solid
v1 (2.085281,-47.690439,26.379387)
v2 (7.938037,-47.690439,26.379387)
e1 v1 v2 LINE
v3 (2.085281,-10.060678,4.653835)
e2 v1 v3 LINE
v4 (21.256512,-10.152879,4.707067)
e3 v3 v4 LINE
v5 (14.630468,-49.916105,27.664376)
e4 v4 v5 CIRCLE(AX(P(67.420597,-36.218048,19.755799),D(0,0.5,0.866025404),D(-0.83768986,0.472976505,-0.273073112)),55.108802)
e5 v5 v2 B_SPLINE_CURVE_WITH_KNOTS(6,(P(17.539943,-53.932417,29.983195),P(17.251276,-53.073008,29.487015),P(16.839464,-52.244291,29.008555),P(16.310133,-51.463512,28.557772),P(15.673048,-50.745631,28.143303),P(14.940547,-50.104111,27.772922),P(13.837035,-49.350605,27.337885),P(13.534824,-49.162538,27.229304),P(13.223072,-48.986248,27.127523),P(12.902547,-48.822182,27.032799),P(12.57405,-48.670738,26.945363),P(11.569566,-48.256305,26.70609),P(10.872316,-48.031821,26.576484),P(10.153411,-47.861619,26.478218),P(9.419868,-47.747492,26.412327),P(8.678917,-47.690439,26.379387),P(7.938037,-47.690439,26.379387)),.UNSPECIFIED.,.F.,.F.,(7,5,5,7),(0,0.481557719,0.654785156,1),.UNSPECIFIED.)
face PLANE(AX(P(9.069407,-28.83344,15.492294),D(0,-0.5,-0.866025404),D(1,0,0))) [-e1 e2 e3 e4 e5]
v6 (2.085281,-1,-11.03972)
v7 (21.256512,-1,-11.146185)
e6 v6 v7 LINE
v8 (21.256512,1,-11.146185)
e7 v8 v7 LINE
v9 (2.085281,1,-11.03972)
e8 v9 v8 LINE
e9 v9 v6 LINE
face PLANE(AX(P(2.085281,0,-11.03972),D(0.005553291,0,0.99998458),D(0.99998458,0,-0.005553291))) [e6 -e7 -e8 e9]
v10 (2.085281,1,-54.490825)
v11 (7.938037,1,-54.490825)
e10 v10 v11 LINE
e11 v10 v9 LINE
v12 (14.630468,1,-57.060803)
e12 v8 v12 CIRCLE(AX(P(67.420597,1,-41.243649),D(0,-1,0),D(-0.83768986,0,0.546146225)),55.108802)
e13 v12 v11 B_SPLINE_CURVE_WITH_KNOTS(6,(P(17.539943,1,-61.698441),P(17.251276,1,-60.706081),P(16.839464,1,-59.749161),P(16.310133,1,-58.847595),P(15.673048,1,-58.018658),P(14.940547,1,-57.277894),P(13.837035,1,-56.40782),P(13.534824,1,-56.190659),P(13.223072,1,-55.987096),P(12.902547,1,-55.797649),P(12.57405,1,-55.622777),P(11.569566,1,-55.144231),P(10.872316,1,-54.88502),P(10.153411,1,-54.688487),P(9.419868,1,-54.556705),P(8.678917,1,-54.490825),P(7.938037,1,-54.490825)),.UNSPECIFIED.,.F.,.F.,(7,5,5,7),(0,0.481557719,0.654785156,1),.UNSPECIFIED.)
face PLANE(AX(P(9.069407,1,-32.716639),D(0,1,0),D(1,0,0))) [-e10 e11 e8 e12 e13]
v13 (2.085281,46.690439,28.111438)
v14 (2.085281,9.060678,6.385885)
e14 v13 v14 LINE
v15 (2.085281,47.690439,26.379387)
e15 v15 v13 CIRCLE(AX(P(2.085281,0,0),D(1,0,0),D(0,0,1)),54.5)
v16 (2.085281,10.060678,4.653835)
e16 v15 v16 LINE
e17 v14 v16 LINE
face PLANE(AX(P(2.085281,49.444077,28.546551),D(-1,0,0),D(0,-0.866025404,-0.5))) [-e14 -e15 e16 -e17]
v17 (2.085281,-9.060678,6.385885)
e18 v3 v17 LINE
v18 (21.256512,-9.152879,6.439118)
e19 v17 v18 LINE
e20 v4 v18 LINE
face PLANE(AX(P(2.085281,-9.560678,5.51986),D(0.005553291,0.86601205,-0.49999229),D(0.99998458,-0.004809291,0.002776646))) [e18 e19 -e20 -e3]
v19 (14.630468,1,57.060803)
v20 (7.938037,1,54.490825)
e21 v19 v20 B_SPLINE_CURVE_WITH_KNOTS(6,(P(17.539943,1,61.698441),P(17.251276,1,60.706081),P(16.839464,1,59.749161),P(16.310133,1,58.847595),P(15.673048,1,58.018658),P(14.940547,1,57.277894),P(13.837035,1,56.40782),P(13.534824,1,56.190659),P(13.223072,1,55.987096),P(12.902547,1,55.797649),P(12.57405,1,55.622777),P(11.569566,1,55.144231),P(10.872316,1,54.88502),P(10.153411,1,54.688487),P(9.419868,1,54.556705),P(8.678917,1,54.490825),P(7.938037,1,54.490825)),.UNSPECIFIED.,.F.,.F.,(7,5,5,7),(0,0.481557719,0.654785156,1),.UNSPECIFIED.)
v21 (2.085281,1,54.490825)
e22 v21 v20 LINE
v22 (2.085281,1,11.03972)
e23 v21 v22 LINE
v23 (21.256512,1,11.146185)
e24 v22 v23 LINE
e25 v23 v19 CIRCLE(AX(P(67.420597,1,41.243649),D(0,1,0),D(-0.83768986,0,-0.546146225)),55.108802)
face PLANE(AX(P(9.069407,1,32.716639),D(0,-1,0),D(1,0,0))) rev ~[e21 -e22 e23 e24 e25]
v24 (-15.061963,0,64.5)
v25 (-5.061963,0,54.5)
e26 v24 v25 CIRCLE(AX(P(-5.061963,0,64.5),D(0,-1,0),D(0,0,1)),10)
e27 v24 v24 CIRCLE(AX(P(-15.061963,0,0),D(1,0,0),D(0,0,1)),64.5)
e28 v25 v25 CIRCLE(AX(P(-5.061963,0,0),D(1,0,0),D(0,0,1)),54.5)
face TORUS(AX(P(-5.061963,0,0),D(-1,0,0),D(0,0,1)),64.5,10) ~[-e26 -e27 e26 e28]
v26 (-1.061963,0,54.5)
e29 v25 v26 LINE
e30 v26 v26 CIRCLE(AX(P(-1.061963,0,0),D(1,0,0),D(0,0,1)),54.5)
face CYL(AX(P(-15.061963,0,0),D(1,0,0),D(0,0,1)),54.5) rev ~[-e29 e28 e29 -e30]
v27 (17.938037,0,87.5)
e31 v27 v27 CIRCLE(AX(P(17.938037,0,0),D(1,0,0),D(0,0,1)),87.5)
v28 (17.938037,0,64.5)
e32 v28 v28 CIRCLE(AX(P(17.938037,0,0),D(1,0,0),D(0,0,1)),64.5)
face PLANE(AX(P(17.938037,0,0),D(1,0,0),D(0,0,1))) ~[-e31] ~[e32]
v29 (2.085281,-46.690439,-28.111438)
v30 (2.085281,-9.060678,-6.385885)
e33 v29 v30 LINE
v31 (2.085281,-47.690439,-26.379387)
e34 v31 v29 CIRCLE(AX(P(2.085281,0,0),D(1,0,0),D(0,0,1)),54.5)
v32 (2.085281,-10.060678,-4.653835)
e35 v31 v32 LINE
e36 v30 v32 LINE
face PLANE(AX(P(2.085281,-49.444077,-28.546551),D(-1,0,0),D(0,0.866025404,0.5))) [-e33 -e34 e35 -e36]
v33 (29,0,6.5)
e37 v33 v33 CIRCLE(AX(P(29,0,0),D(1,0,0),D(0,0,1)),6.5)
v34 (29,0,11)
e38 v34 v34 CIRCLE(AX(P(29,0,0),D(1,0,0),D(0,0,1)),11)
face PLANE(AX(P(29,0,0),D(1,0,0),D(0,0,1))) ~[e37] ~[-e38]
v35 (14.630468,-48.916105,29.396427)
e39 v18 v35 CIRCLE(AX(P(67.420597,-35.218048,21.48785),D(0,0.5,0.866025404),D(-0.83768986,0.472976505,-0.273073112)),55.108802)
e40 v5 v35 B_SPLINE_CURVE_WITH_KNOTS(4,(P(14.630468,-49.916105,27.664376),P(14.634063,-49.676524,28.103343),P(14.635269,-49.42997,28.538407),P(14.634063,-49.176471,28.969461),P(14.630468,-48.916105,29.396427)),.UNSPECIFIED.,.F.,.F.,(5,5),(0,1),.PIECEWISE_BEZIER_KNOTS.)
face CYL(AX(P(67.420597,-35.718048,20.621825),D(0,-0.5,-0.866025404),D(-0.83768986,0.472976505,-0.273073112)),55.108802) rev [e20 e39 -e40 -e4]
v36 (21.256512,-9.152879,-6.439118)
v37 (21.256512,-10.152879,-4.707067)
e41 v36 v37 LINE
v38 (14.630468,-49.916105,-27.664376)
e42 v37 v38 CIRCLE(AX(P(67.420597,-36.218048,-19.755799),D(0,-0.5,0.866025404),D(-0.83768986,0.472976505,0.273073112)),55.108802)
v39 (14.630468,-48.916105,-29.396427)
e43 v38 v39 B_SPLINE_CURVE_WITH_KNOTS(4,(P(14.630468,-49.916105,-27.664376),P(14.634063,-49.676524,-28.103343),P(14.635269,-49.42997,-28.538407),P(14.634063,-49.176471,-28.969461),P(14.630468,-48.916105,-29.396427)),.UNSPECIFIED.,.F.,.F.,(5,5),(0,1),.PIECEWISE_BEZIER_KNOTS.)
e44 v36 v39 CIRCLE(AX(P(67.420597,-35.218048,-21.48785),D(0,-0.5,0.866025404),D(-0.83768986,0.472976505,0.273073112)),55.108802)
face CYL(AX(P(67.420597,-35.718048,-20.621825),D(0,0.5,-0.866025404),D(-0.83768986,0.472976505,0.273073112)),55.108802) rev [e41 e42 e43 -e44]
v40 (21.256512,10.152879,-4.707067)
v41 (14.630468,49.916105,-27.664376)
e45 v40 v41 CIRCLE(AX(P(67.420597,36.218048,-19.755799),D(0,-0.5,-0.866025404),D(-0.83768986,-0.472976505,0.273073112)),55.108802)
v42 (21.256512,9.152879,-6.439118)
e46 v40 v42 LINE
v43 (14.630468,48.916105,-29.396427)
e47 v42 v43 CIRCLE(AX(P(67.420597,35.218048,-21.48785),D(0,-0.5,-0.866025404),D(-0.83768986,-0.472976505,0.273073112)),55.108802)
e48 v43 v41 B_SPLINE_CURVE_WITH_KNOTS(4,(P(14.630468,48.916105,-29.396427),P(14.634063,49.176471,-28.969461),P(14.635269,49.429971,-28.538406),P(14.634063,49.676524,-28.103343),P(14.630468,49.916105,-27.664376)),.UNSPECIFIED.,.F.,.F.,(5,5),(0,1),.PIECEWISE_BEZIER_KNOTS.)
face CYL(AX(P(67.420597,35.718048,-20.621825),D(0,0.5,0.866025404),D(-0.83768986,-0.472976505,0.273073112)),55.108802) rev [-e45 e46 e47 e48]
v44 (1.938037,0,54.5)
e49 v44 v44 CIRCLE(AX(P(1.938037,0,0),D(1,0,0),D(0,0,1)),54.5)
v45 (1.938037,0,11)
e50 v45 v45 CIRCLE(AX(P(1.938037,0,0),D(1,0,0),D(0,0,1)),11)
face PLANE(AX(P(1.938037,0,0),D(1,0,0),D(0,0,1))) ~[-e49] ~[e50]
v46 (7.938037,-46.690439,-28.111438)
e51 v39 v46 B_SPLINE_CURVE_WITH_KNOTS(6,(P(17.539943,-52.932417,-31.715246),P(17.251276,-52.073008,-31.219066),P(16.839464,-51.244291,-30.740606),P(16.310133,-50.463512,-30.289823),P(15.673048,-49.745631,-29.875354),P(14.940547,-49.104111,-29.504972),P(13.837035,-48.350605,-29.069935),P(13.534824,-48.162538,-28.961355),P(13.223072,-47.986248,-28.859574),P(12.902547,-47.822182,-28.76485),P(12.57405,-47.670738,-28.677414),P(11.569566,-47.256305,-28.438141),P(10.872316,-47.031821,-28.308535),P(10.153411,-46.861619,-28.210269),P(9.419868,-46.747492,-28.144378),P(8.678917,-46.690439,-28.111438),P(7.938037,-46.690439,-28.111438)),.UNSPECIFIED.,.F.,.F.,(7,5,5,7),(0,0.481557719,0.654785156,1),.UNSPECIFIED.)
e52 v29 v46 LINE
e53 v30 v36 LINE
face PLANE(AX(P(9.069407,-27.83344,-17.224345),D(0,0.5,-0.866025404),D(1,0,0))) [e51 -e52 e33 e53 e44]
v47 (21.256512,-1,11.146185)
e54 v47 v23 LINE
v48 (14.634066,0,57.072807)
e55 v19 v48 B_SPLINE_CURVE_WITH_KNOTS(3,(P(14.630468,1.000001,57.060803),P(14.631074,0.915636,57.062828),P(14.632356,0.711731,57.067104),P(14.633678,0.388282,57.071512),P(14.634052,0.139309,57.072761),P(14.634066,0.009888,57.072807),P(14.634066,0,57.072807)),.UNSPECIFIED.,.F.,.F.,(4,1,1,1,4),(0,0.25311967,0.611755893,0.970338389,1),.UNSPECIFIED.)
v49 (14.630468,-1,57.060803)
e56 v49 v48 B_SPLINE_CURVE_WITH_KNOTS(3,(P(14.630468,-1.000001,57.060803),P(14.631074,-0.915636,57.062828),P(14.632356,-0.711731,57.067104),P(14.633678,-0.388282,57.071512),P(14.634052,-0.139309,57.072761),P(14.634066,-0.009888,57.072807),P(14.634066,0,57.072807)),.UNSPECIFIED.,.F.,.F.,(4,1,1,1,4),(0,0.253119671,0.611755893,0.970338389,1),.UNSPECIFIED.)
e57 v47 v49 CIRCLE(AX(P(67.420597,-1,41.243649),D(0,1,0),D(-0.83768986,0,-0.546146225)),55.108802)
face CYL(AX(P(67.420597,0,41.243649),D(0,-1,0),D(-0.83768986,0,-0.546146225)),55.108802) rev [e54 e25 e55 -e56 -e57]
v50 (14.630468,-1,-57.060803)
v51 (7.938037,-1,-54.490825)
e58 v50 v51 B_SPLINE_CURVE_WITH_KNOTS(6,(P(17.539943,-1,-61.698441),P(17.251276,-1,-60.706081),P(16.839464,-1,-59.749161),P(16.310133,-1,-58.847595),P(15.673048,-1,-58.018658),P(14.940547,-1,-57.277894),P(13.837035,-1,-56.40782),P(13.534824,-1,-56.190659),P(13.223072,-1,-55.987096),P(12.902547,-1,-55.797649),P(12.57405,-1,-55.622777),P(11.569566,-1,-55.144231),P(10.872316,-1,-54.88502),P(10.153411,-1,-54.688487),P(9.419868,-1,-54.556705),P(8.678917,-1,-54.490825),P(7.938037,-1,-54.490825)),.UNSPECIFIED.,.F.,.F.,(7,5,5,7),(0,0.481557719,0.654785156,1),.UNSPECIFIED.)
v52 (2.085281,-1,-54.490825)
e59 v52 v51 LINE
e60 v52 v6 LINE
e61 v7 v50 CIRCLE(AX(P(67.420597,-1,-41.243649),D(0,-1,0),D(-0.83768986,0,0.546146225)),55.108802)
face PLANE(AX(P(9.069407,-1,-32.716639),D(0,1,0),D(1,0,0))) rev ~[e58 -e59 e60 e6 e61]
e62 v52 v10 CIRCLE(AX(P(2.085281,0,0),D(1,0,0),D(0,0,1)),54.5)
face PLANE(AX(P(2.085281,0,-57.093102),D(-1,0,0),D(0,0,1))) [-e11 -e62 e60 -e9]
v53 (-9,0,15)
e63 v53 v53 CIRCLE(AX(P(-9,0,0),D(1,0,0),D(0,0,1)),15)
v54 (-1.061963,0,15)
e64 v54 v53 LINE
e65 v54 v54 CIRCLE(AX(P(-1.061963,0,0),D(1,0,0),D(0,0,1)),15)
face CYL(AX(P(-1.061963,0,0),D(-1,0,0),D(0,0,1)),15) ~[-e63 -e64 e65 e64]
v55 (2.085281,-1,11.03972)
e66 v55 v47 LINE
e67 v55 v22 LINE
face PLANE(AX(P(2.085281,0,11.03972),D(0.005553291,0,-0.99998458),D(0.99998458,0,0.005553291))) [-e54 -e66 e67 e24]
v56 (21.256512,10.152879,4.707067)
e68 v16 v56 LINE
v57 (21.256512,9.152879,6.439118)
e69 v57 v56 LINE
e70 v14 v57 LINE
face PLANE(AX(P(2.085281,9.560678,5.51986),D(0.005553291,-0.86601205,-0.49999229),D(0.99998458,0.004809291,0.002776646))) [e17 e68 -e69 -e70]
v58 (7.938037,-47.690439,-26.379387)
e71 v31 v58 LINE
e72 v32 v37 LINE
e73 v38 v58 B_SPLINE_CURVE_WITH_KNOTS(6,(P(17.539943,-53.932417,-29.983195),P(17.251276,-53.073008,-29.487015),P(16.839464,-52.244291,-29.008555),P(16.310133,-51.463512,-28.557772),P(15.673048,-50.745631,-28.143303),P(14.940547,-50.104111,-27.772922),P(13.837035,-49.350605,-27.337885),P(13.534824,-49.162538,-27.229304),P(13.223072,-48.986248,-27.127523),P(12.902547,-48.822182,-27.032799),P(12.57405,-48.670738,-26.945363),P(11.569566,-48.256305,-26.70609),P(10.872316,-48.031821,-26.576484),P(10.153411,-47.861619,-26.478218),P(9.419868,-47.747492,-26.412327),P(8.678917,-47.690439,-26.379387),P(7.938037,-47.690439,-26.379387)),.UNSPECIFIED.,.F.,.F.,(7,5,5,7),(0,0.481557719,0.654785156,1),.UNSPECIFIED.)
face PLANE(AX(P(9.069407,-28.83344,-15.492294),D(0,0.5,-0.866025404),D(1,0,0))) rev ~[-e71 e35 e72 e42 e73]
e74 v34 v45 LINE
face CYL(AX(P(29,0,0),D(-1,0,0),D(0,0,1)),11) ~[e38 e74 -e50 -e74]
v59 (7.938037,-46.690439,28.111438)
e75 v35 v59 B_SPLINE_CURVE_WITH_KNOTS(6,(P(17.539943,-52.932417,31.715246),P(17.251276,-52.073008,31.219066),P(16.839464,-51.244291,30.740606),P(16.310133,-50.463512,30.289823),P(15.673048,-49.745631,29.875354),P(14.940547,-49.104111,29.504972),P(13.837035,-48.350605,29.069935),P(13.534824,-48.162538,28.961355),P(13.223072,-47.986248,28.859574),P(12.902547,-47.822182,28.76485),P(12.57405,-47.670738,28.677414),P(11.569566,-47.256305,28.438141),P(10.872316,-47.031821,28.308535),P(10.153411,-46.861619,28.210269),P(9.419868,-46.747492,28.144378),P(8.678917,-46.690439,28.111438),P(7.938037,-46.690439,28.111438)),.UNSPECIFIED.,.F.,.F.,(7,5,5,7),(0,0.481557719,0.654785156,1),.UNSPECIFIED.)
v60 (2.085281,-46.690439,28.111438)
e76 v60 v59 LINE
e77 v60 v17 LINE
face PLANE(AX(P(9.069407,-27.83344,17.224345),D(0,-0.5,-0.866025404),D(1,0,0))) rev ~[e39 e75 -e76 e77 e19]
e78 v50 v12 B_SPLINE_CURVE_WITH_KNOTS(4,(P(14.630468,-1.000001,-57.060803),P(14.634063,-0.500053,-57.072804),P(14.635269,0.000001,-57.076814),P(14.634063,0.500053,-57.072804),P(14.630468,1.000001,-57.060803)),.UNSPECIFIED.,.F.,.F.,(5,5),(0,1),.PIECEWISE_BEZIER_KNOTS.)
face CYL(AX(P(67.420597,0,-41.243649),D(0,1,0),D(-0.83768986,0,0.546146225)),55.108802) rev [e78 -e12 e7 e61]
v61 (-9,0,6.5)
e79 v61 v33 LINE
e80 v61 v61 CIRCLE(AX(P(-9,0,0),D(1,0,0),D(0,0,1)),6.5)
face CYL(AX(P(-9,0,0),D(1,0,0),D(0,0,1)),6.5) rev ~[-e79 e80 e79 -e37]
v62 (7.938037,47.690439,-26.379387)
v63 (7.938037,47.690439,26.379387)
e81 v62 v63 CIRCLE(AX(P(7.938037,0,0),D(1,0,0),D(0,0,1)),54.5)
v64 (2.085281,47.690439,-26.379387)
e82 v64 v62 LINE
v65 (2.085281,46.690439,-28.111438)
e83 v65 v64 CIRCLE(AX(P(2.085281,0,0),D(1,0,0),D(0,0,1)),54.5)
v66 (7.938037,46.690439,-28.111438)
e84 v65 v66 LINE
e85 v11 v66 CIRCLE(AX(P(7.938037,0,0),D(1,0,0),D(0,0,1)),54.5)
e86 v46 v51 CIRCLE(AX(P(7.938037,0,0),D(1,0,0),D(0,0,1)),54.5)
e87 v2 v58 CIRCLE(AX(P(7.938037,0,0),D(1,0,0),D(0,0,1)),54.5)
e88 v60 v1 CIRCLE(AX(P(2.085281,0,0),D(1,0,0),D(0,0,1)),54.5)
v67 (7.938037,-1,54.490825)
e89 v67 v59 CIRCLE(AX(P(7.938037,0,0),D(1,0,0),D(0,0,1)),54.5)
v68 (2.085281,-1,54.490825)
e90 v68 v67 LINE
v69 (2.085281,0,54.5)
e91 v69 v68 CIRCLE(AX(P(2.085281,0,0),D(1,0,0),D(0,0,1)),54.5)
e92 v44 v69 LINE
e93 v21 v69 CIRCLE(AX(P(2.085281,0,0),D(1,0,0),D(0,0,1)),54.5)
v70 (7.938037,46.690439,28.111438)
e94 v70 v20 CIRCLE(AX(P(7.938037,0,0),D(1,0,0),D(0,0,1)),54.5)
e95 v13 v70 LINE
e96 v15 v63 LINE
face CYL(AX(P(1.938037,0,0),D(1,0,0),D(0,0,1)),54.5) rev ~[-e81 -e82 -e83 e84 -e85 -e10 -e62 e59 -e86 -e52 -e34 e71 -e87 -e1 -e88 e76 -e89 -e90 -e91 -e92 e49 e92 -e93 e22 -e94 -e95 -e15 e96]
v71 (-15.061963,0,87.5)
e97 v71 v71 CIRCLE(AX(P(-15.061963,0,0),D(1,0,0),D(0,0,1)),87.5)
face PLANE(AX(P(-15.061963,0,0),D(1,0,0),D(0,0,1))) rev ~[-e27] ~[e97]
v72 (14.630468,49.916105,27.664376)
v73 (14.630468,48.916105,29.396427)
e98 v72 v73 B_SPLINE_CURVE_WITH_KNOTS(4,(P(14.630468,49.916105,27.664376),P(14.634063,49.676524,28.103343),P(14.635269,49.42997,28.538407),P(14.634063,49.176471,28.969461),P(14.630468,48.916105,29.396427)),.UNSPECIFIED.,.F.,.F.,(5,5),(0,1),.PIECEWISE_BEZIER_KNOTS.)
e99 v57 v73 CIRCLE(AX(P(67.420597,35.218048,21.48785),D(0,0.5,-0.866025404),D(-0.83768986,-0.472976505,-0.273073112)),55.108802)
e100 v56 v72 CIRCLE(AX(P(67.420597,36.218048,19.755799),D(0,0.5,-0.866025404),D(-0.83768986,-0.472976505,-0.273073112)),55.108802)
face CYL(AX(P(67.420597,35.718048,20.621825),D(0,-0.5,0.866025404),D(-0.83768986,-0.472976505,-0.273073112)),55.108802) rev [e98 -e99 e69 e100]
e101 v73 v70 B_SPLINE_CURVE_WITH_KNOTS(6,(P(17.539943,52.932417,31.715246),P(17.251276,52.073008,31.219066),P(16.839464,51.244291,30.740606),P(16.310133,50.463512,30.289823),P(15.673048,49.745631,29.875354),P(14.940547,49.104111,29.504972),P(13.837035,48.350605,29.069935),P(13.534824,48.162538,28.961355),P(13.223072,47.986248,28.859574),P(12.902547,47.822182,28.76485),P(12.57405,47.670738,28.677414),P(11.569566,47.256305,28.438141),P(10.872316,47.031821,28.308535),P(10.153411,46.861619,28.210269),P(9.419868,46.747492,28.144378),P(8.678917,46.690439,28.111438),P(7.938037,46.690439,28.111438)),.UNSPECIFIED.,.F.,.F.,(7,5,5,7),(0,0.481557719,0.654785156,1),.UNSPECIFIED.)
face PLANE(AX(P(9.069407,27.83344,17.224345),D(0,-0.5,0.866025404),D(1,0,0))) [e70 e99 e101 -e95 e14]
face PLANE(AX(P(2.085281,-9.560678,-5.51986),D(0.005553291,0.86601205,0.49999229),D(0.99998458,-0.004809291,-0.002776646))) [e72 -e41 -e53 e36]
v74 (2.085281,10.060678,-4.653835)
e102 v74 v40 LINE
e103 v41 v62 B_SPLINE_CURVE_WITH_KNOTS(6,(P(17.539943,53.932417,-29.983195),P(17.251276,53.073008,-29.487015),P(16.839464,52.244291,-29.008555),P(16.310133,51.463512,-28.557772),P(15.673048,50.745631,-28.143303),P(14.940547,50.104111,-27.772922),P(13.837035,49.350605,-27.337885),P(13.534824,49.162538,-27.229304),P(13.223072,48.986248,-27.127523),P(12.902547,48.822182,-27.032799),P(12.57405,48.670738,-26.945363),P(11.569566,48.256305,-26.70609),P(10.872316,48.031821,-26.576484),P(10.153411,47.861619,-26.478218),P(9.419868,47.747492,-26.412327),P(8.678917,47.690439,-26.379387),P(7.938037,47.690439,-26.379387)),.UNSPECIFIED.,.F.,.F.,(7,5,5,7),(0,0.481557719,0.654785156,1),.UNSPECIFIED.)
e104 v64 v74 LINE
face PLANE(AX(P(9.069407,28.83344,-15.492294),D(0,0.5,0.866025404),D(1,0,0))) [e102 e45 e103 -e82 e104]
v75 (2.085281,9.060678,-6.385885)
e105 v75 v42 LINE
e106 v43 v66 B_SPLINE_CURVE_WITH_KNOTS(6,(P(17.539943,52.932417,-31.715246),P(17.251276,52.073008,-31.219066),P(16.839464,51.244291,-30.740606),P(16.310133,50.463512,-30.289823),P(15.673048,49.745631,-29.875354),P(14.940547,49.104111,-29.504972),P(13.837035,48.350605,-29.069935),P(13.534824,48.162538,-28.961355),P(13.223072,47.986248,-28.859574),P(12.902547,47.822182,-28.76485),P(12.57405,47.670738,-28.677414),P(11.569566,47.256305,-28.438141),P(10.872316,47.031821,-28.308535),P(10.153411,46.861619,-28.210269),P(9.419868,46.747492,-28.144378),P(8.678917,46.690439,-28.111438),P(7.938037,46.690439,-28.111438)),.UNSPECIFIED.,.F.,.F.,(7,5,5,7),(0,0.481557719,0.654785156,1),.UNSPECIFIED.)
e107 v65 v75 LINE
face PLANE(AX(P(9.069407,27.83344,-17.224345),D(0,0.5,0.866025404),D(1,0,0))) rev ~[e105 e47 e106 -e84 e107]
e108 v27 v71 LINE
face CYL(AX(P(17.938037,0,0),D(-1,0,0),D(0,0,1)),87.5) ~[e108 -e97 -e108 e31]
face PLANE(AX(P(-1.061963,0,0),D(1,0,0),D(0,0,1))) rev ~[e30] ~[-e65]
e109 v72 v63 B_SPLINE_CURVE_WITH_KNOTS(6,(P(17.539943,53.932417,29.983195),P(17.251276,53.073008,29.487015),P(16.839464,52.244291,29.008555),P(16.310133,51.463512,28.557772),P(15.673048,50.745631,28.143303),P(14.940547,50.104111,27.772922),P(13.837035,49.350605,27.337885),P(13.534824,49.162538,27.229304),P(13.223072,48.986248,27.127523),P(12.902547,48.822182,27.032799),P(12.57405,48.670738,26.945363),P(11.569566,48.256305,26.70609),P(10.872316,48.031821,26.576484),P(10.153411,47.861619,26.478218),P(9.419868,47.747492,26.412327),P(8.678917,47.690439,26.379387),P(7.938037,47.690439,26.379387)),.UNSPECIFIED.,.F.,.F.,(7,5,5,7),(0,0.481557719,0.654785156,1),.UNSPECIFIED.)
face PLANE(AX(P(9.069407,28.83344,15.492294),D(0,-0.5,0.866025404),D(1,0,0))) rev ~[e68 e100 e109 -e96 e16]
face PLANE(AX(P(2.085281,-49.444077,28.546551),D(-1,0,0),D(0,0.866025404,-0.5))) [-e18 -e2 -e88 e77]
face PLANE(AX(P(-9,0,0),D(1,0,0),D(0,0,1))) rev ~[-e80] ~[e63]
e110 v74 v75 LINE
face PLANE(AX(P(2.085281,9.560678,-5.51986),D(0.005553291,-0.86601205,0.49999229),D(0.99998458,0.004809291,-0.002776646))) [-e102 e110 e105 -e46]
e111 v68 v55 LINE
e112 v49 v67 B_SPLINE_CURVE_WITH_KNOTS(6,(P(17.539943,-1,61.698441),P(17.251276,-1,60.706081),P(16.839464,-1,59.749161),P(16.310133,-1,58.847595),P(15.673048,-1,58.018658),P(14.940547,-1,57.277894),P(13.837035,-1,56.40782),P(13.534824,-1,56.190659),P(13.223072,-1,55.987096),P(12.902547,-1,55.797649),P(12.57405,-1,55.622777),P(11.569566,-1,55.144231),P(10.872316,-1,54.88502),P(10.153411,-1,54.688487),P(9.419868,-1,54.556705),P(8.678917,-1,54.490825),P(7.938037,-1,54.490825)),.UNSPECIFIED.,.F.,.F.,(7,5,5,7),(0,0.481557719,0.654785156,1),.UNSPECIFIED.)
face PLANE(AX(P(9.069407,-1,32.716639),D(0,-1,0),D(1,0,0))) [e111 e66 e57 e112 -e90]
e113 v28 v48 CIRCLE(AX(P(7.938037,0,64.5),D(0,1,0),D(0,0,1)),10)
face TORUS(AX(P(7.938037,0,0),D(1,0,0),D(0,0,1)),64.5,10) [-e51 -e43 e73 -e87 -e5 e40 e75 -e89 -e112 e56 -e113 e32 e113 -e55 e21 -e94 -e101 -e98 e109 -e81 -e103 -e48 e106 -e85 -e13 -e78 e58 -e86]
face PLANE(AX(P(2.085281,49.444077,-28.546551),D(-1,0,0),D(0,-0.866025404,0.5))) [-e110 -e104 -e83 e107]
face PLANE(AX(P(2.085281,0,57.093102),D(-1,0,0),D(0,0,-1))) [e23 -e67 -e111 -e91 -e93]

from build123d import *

# Parameters (mm, degrees)
F3_R            = 10
F5_DEPTH        = 1
F5_COPIES_COUNT = 6


# Not quite as in the source:
# - a pattern or mirror of a feature is missing from the dataset's text; its kind, count and spacing are read off the source's solid


with BuildPart() as f2:
    # F1 (on Front) → F2 (revolve)
    with BuildSketch(Plane.XZ):
        Polygon((17.9380366504, 54.5), (17.9380366504, 87.5), (-15.0619633496, 87.5), (-15.0619633496, 54.5), (-1.0619633496, 54.5), (-1.0619633496, 15), (-9, 15), (-9, 6.5), (29, 6.5), (29, 11), (1.9380366504, 11), (1.9380366504, 54.5), align=None)
    revolve(axis=Axis((-1.7091594636, 0, 0), (1, 0, 0)))

    # F3
    f3_edges = [f2.edges().sort_by_distance(p)[0] for p in [
        (17.938037, 0, -54.5),
        (-15.061963, 0, -54.5),
    ]]
    fillet(f3_edges, radius=F3_R)

    # F4 (on Front) → F5 (join, symmetric)
    with BuildSketch(Plane.XZ):
        with BuildLine():
            ThreePointArc((21.256512031, 11.1461849883), (12.8744275284, 33.3890012192), (14.6401561797, 57.0931024849))
            Line((14.6401561797, 57.0931024849), (2.0852813032, 57.0931024849))
            Line((2.0852813032, 57.0931024849), (2.0852813032, 11.0397199169))
            Line((2.0852813032, 11.0397199169), (21.256512031, 11.1461849883))
        make_face()
    f5 = extrude(amount=F5_DEPTH, both=True)

    # F5_copies: F5 ×6 about axis
    f5_copies_axis = Axis((0, 0, 0), (1, 0, 0))
    for i in range(1, F5_COPIES_COUNT):
        add(f5.rotate(f5_copies_axis, i * 360 / F5_COPIES_COUNT))


solid = f2.part
